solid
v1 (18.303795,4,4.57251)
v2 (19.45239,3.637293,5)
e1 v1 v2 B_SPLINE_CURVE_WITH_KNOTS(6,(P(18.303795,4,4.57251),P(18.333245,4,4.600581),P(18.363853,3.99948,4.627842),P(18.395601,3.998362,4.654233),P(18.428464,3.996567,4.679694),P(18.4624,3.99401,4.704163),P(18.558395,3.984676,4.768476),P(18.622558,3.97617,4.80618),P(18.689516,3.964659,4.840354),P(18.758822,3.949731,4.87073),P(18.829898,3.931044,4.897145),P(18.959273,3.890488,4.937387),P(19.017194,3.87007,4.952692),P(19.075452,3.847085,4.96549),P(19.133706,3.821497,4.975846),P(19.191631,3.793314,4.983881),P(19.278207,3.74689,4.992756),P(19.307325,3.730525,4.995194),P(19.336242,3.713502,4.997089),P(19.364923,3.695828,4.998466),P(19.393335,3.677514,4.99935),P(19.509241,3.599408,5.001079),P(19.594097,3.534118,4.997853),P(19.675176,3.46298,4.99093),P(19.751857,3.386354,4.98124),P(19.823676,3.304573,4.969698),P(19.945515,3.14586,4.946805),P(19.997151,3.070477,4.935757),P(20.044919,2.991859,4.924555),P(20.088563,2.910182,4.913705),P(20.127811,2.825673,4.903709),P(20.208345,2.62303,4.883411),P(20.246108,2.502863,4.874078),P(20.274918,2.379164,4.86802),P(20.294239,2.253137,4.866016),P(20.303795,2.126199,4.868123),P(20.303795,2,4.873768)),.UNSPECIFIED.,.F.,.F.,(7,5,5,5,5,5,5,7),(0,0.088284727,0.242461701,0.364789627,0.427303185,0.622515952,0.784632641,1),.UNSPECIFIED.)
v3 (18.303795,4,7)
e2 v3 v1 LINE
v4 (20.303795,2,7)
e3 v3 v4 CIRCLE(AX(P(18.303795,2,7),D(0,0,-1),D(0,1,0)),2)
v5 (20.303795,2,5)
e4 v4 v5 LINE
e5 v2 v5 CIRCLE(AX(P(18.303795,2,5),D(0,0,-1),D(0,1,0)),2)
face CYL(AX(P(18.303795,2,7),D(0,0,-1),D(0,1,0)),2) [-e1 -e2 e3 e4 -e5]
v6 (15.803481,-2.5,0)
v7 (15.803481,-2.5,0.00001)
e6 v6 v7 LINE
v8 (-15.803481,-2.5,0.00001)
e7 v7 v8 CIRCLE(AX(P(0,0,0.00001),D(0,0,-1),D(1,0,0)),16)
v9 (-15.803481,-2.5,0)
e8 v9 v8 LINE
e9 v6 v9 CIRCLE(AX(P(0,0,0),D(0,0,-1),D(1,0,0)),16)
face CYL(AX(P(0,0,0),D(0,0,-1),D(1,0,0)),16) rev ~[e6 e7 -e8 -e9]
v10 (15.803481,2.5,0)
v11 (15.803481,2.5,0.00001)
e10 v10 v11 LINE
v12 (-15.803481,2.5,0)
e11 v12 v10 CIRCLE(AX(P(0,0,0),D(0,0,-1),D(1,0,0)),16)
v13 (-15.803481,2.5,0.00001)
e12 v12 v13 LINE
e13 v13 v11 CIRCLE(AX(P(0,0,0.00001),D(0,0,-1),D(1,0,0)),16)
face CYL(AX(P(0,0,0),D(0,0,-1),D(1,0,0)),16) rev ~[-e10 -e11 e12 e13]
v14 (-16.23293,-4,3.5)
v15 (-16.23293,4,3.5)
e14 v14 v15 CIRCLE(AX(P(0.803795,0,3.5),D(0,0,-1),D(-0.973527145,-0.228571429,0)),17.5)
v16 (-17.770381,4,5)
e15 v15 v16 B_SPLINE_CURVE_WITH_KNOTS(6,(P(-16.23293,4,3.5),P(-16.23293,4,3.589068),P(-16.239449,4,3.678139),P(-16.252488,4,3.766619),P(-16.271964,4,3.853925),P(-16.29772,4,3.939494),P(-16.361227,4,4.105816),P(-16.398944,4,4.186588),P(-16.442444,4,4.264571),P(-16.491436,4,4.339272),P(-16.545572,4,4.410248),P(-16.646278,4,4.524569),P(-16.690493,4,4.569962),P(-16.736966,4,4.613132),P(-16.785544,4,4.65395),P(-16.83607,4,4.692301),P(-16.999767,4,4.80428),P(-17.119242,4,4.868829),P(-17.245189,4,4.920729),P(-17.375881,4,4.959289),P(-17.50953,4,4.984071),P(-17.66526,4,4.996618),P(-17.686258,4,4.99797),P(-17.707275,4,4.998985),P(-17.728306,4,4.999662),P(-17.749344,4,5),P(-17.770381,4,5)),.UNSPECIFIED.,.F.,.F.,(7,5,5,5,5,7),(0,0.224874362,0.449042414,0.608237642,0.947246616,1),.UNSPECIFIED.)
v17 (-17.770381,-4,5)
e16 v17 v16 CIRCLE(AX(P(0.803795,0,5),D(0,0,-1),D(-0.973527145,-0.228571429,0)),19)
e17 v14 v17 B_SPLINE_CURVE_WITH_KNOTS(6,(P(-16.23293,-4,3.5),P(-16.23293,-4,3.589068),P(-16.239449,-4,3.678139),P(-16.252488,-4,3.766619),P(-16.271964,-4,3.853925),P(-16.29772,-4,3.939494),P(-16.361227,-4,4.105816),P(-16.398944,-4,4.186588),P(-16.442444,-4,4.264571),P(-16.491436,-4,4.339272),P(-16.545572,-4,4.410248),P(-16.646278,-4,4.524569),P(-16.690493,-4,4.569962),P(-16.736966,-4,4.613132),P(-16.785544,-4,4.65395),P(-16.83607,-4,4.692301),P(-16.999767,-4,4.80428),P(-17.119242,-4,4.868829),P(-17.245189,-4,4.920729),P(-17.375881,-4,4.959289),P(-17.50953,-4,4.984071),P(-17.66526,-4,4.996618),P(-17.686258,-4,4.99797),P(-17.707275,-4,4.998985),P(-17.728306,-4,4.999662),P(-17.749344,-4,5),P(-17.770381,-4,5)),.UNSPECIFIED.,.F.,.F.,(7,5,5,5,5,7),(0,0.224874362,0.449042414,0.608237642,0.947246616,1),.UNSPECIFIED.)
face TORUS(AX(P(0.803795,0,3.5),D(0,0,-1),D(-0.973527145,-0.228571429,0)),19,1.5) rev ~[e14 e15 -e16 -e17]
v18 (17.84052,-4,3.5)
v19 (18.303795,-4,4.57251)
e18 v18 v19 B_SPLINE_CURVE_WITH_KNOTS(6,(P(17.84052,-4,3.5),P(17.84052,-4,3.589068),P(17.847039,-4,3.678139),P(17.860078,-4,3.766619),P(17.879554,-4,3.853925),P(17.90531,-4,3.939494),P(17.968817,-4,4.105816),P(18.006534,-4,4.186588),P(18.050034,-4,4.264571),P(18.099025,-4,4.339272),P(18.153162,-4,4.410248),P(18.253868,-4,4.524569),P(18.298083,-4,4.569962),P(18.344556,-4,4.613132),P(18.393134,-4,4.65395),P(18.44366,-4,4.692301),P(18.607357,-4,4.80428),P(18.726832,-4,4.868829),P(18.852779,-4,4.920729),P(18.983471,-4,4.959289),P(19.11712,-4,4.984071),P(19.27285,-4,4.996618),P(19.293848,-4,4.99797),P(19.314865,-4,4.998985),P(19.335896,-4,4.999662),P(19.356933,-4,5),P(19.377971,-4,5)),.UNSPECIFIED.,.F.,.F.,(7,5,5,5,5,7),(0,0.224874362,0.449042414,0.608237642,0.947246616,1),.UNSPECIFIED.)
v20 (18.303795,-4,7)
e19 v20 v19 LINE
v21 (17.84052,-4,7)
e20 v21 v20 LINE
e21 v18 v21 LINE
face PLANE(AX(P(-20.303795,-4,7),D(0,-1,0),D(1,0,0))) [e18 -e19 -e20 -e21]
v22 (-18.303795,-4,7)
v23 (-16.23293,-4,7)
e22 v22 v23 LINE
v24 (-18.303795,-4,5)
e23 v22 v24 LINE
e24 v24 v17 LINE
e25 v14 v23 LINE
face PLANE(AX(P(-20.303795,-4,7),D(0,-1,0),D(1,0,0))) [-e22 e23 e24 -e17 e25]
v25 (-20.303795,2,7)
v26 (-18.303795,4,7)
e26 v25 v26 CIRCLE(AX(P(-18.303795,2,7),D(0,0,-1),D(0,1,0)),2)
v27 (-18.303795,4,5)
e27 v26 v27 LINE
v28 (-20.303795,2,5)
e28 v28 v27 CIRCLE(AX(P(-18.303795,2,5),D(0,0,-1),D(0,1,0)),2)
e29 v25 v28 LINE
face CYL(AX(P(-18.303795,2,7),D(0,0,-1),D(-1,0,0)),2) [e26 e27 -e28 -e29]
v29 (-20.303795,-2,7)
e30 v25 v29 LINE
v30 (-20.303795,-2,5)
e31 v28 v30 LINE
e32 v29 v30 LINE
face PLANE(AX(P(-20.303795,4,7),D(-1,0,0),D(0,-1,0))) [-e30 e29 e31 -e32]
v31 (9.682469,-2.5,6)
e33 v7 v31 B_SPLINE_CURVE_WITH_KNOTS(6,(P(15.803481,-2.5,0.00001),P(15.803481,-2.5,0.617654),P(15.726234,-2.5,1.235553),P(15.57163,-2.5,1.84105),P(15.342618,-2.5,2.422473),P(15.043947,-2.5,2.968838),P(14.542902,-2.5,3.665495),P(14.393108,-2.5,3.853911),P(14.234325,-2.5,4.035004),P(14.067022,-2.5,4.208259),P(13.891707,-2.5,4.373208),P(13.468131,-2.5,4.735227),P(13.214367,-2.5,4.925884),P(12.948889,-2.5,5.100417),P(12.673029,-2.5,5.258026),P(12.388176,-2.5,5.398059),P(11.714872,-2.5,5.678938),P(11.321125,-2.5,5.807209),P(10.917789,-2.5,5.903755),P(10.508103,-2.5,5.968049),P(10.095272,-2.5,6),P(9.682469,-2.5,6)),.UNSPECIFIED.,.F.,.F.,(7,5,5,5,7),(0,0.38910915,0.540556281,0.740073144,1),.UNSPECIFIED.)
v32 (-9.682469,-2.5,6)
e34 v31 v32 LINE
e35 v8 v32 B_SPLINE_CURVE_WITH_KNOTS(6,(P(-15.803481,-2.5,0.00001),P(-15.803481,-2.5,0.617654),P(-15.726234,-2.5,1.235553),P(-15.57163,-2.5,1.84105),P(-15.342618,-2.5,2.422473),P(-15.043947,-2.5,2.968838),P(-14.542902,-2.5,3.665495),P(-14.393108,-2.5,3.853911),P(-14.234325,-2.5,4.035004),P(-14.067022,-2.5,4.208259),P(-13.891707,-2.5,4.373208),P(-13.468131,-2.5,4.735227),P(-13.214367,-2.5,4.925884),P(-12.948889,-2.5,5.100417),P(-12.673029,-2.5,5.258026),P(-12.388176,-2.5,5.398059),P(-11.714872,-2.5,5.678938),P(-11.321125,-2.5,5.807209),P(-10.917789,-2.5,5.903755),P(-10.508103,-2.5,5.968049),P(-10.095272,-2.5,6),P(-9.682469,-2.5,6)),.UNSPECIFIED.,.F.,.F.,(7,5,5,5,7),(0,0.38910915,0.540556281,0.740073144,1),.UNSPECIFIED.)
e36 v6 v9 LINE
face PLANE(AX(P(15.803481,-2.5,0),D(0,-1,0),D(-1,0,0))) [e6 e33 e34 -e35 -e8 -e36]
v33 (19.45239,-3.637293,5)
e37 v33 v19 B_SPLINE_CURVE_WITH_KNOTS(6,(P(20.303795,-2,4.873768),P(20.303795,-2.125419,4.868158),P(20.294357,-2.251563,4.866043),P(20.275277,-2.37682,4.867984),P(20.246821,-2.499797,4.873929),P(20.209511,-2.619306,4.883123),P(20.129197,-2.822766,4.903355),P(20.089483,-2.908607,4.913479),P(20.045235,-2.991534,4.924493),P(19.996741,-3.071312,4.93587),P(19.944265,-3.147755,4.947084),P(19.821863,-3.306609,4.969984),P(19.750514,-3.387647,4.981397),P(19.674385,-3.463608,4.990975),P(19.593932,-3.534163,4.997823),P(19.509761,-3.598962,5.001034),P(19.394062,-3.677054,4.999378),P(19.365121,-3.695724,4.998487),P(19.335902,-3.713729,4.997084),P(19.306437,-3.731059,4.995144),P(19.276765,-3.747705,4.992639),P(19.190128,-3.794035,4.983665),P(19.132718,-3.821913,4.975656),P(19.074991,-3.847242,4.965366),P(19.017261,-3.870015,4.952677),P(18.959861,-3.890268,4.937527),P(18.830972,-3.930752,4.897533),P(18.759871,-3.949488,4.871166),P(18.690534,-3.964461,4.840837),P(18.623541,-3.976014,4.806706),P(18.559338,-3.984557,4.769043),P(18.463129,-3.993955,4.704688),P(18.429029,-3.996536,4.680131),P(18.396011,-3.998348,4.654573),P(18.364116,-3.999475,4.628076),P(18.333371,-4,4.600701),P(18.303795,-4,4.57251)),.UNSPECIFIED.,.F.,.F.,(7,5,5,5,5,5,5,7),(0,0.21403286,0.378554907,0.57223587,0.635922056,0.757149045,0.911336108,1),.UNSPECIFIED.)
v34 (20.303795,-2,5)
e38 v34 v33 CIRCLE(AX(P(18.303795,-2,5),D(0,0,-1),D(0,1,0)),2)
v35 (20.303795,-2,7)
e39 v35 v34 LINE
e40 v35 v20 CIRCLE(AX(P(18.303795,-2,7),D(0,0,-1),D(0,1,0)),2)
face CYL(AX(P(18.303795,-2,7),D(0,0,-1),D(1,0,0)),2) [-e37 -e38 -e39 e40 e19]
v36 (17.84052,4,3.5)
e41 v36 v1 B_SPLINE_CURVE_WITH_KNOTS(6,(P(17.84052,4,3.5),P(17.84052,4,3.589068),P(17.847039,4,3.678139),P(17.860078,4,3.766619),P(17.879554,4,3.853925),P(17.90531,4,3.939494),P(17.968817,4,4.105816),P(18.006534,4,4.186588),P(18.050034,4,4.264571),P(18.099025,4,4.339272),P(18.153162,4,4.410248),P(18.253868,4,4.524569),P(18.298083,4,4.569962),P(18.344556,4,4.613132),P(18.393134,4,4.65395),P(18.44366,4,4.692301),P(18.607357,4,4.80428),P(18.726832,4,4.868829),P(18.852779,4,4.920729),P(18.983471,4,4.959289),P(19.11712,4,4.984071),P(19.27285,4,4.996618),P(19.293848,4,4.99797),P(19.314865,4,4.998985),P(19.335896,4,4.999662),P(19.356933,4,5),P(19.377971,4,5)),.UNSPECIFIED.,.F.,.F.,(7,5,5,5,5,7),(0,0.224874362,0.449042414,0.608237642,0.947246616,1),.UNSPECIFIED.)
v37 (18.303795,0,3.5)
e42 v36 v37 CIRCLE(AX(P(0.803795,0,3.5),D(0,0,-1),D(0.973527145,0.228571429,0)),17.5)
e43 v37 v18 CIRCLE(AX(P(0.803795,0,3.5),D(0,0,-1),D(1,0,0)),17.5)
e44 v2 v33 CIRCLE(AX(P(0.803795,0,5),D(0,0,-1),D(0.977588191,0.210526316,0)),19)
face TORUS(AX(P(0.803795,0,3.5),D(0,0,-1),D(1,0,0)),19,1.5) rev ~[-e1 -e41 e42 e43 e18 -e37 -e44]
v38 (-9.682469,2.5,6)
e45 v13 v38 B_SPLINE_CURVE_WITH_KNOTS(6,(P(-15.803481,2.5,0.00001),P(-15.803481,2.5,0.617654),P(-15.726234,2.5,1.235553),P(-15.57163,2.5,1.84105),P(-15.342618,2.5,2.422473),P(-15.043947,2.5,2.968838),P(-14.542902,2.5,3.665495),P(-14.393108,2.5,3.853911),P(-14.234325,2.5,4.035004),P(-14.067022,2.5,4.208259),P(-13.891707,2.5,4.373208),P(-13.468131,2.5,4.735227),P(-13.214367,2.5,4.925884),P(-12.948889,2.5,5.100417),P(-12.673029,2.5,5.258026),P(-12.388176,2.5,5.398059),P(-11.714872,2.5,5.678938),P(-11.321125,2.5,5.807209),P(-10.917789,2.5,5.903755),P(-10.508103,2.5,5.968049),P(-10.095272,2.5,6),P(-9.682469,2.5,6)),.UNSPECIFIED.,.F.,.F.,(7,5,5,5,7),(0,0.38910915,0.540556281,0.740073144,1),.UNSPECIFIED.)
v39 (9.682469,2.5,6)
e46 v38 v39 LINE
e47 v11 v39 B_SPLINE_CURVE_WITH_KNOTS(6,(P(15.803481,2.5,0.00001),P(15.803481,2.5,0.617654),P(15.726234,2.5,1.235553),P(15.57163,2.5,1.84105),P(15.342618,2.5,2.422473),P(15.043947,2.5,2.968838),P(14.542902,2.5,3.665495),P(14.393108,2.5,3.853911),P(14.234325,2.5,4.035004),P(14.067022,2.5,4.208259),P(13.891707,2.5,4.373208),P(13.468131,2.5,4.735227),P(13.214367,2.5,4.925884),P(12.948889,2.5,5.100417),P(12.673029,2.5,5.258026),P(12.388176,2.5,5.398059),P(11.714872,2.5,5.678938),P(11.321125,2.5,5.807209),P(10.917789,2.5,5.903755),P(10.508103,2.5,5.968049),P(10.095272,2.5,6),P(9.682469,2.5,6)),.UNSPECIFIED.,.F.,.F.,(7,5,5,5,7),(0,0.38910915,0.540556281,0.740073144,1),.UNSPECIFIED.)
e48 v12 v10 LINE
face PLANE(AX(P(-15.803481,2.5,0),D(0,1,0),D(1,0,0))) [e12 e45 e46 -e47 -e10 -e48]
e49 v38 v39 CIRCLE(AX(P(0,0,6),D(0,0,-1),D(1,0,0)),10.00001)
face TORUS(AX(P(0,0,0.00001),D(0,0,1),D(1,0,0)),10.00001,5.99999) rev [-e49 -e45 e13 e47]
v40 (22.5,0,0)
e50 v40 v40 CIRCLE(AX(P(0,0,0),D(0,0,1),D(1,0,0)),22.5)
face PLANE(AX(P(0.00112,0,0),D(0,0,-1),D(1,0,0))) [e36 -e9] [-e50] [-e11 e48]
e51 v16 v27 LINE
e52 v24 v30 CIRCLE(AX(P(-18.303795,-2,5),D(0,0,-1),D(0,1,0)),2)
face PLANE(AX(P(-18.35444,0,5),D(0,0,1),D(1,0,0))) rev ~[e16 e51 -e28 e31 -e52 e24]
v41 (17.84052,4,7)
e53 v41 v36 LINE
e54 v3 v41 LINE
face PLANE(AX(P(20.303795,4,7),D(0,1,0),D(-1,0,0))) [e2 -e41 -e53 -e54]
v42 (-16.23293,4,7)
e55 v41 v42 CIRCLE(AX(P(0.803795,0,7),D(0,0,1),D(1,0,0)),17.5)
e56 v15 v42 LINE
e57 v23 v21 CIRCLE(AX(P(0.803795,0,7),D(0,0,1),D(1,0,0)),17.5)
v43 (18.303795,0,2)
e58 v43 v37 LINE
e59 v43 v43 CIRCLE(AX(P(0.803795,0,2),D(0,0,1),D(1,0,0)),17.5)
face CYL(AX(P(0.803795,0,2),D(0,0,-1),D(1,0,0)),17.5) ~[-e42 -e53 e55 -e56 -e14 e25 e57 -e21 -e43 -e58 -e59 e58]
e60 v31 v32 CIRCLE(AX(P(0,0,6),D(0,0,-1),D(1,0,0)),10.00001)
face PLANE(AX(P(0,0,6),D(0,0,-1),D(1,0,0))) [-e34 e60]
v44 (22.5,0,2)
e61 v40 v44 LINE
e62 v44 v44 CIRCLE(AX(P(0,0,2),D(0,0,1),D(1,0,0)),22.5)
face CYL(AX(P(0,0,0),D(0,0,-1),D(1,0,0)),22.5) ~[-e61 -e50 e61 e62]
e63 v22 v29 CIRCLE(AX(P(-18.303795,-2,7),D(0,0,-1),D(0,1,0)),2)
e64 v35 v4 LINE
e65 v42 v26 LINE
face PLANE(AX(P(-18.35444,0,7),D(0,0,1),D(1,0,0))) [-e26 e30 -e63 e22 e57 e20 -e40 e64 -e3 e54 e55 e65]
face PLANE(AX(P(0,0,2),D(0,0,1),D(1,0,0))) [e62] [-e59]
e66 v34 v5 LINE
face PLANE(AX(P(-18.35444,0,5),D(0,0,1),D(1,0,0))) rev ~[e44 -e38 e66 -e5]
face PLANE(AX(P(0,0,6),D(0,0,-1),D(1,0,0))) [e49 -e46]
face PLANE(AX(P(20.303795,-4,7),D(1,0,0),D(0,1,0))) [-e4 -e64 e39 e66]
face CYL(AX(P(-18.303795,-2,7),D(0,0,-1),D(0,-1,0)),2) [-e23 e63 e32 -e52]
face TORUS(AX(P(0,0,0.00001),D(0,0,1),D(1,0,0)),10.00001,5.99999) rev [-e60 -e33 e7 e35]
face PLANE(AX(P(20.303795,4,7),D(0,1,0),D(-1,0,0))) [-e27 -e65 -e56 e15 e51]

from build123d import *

# Parameters (mm, degrees)
F0_R     = 22.5
F1_DEPTH = 2
F2_R     = 17.5
F3_DEPTH = 5
F5_DEPTH = 2
F6_R     = 1.5
F7_R     = 2
F8_R     = 16
F9_DEPTH = 6
F10_R    = 5.99999


# Not quite as in the source:
# - a fillet or chamfer is up to 0.001 mm smaller than in the source, because OpenCascade refuses the exact size


with BuildPart() as f1:
    # F0 (on Top) → F1 (new body)
    with BuildSketch(Plane.XY):
        Circle(F0_R)
    extrude(amount=F1_DEPTH)

    # F2 (on face) → F3 (join)
    with BuildSketch(Plane.XY.offset(2)):
        with Locations((0.8037949441, 0)):
            Circle(F2_R)
    extrude(amount=F3_DEPTH)

    # F4 (on face) → F5 (join)
    with BuildSketch(Plane.XY.offset(7)):
        with BuildLine():
            Line((-20.3037949441, -4), (-16.2329300933, -4))
            ThreePointArc((-16.2329300933, -4), (-16.6962050559, 0), (-16.2329300933, 4))
            Line((-16.2329300933, 4), (-20.3037949441, 4))
            Line((-20.3037949441, 4), (-20.3037949441, -4))
        make_face()
        with BuildLine():
            Line((-16.2329300933, -4), (17.8405199815, -4))
            ThreePointArc((17.8405199815, -4), (18.1875903893, -2.0133692962), (18.3037949441, 0))
            ThreePointArc((18.3037949441, 0), (18.1875903893, 2.0133692962), (17.8405199815, 4))
            Line((17.8405199815, 4), (-16.2329300933, 4))
            ThreePointArc((-16.2329300933, 4), (-16.6962050559, 0), (-16.2329300933, -4))
        make_face()
        with BuildLine():
            Line((17.8405199815, -4), (20.3037949441, -4))
            Line((20.3037949441, -4), (20.3037949441, 4))
            Line((20.3037949441, 4), (17.8405199815, 4))
            ThreePointArc((17.8405199815, 4), (18.1875903893, 2.0133692962), (18.3037949441, 0))
            ThreePointArc((18.3037949441, 0), (18.1875903893, -2.0133692962), (17.8405199815, -4))
        make_face()
    extrude(amount=-F5_DEPTH)

    # F6
    f6_edges = [f1.edges().sort_by_distance(p)[0] for p in [
        (18.18759, -2.013369, 5),
        (-16.696205, 0, 5),
        (18.18759, 2.013369, 5),
    ]]
    fillet(f6_edges, radius=F6_R)

    # F7
    f7_edges = [f1.edges().sort_by_distance(p)[0] for p in [
        (-20.303795, 4, 6),
        (-20.303795, -4, 6),
        (20.303795, -4, 6),
        (20.303795, 4, 6),
    ]]
    fillet(f7_edges, radius=F7_R)

    # F8 (on face) → F9 (cut)
    with BuildSketch(Plane(origin=(0, 0, 0), x_dir=(1, 0, 0), z_dir=(0, 0, -1))):
        Circle(F8_R)
    extrude(amount=-F9_DEPTH, mode=Mode.SUBTRACT)

    # F10 (radius 6 in the source; OpenCascade refuses exactly that, so slightly less here)
    f10_edges = [f1.edges().sort_by_distance(p)[0] for p in [
        (-16, 0, 6),
    ]]
    fillet(f10_edges, radius=F10_R)

    # F11 (on face) → F12 (join, up to the next surface of F1)
    with BuildSketch(Plane(origin=(0, 0, 0), x_dir=(1, 0, 0), z_dir=(0, 0, -1))):
        with BuildLine():
            Line((15.8034806293, 2.5), (-15.8034806293, 2.5))
            ThreePointArc((-15.8034806293, 2.5), (-16, 0), (-15.8034806293, -2.5))
            Line((-15.8034806293, -2.5), (15.8034806293, -2.5))
            ThreePointArc((15.8034806293, -2.5), (15.9507944954, -1.2538560387), (16, 0))
            ThreePointArc((16, 0), (15.9507944954, 1.2538560387), (15.8034806293, 2.5))
        make_face()
    extrude(until=Until.NEXT, dir=(0, 0, 1))


solid = f1.part
